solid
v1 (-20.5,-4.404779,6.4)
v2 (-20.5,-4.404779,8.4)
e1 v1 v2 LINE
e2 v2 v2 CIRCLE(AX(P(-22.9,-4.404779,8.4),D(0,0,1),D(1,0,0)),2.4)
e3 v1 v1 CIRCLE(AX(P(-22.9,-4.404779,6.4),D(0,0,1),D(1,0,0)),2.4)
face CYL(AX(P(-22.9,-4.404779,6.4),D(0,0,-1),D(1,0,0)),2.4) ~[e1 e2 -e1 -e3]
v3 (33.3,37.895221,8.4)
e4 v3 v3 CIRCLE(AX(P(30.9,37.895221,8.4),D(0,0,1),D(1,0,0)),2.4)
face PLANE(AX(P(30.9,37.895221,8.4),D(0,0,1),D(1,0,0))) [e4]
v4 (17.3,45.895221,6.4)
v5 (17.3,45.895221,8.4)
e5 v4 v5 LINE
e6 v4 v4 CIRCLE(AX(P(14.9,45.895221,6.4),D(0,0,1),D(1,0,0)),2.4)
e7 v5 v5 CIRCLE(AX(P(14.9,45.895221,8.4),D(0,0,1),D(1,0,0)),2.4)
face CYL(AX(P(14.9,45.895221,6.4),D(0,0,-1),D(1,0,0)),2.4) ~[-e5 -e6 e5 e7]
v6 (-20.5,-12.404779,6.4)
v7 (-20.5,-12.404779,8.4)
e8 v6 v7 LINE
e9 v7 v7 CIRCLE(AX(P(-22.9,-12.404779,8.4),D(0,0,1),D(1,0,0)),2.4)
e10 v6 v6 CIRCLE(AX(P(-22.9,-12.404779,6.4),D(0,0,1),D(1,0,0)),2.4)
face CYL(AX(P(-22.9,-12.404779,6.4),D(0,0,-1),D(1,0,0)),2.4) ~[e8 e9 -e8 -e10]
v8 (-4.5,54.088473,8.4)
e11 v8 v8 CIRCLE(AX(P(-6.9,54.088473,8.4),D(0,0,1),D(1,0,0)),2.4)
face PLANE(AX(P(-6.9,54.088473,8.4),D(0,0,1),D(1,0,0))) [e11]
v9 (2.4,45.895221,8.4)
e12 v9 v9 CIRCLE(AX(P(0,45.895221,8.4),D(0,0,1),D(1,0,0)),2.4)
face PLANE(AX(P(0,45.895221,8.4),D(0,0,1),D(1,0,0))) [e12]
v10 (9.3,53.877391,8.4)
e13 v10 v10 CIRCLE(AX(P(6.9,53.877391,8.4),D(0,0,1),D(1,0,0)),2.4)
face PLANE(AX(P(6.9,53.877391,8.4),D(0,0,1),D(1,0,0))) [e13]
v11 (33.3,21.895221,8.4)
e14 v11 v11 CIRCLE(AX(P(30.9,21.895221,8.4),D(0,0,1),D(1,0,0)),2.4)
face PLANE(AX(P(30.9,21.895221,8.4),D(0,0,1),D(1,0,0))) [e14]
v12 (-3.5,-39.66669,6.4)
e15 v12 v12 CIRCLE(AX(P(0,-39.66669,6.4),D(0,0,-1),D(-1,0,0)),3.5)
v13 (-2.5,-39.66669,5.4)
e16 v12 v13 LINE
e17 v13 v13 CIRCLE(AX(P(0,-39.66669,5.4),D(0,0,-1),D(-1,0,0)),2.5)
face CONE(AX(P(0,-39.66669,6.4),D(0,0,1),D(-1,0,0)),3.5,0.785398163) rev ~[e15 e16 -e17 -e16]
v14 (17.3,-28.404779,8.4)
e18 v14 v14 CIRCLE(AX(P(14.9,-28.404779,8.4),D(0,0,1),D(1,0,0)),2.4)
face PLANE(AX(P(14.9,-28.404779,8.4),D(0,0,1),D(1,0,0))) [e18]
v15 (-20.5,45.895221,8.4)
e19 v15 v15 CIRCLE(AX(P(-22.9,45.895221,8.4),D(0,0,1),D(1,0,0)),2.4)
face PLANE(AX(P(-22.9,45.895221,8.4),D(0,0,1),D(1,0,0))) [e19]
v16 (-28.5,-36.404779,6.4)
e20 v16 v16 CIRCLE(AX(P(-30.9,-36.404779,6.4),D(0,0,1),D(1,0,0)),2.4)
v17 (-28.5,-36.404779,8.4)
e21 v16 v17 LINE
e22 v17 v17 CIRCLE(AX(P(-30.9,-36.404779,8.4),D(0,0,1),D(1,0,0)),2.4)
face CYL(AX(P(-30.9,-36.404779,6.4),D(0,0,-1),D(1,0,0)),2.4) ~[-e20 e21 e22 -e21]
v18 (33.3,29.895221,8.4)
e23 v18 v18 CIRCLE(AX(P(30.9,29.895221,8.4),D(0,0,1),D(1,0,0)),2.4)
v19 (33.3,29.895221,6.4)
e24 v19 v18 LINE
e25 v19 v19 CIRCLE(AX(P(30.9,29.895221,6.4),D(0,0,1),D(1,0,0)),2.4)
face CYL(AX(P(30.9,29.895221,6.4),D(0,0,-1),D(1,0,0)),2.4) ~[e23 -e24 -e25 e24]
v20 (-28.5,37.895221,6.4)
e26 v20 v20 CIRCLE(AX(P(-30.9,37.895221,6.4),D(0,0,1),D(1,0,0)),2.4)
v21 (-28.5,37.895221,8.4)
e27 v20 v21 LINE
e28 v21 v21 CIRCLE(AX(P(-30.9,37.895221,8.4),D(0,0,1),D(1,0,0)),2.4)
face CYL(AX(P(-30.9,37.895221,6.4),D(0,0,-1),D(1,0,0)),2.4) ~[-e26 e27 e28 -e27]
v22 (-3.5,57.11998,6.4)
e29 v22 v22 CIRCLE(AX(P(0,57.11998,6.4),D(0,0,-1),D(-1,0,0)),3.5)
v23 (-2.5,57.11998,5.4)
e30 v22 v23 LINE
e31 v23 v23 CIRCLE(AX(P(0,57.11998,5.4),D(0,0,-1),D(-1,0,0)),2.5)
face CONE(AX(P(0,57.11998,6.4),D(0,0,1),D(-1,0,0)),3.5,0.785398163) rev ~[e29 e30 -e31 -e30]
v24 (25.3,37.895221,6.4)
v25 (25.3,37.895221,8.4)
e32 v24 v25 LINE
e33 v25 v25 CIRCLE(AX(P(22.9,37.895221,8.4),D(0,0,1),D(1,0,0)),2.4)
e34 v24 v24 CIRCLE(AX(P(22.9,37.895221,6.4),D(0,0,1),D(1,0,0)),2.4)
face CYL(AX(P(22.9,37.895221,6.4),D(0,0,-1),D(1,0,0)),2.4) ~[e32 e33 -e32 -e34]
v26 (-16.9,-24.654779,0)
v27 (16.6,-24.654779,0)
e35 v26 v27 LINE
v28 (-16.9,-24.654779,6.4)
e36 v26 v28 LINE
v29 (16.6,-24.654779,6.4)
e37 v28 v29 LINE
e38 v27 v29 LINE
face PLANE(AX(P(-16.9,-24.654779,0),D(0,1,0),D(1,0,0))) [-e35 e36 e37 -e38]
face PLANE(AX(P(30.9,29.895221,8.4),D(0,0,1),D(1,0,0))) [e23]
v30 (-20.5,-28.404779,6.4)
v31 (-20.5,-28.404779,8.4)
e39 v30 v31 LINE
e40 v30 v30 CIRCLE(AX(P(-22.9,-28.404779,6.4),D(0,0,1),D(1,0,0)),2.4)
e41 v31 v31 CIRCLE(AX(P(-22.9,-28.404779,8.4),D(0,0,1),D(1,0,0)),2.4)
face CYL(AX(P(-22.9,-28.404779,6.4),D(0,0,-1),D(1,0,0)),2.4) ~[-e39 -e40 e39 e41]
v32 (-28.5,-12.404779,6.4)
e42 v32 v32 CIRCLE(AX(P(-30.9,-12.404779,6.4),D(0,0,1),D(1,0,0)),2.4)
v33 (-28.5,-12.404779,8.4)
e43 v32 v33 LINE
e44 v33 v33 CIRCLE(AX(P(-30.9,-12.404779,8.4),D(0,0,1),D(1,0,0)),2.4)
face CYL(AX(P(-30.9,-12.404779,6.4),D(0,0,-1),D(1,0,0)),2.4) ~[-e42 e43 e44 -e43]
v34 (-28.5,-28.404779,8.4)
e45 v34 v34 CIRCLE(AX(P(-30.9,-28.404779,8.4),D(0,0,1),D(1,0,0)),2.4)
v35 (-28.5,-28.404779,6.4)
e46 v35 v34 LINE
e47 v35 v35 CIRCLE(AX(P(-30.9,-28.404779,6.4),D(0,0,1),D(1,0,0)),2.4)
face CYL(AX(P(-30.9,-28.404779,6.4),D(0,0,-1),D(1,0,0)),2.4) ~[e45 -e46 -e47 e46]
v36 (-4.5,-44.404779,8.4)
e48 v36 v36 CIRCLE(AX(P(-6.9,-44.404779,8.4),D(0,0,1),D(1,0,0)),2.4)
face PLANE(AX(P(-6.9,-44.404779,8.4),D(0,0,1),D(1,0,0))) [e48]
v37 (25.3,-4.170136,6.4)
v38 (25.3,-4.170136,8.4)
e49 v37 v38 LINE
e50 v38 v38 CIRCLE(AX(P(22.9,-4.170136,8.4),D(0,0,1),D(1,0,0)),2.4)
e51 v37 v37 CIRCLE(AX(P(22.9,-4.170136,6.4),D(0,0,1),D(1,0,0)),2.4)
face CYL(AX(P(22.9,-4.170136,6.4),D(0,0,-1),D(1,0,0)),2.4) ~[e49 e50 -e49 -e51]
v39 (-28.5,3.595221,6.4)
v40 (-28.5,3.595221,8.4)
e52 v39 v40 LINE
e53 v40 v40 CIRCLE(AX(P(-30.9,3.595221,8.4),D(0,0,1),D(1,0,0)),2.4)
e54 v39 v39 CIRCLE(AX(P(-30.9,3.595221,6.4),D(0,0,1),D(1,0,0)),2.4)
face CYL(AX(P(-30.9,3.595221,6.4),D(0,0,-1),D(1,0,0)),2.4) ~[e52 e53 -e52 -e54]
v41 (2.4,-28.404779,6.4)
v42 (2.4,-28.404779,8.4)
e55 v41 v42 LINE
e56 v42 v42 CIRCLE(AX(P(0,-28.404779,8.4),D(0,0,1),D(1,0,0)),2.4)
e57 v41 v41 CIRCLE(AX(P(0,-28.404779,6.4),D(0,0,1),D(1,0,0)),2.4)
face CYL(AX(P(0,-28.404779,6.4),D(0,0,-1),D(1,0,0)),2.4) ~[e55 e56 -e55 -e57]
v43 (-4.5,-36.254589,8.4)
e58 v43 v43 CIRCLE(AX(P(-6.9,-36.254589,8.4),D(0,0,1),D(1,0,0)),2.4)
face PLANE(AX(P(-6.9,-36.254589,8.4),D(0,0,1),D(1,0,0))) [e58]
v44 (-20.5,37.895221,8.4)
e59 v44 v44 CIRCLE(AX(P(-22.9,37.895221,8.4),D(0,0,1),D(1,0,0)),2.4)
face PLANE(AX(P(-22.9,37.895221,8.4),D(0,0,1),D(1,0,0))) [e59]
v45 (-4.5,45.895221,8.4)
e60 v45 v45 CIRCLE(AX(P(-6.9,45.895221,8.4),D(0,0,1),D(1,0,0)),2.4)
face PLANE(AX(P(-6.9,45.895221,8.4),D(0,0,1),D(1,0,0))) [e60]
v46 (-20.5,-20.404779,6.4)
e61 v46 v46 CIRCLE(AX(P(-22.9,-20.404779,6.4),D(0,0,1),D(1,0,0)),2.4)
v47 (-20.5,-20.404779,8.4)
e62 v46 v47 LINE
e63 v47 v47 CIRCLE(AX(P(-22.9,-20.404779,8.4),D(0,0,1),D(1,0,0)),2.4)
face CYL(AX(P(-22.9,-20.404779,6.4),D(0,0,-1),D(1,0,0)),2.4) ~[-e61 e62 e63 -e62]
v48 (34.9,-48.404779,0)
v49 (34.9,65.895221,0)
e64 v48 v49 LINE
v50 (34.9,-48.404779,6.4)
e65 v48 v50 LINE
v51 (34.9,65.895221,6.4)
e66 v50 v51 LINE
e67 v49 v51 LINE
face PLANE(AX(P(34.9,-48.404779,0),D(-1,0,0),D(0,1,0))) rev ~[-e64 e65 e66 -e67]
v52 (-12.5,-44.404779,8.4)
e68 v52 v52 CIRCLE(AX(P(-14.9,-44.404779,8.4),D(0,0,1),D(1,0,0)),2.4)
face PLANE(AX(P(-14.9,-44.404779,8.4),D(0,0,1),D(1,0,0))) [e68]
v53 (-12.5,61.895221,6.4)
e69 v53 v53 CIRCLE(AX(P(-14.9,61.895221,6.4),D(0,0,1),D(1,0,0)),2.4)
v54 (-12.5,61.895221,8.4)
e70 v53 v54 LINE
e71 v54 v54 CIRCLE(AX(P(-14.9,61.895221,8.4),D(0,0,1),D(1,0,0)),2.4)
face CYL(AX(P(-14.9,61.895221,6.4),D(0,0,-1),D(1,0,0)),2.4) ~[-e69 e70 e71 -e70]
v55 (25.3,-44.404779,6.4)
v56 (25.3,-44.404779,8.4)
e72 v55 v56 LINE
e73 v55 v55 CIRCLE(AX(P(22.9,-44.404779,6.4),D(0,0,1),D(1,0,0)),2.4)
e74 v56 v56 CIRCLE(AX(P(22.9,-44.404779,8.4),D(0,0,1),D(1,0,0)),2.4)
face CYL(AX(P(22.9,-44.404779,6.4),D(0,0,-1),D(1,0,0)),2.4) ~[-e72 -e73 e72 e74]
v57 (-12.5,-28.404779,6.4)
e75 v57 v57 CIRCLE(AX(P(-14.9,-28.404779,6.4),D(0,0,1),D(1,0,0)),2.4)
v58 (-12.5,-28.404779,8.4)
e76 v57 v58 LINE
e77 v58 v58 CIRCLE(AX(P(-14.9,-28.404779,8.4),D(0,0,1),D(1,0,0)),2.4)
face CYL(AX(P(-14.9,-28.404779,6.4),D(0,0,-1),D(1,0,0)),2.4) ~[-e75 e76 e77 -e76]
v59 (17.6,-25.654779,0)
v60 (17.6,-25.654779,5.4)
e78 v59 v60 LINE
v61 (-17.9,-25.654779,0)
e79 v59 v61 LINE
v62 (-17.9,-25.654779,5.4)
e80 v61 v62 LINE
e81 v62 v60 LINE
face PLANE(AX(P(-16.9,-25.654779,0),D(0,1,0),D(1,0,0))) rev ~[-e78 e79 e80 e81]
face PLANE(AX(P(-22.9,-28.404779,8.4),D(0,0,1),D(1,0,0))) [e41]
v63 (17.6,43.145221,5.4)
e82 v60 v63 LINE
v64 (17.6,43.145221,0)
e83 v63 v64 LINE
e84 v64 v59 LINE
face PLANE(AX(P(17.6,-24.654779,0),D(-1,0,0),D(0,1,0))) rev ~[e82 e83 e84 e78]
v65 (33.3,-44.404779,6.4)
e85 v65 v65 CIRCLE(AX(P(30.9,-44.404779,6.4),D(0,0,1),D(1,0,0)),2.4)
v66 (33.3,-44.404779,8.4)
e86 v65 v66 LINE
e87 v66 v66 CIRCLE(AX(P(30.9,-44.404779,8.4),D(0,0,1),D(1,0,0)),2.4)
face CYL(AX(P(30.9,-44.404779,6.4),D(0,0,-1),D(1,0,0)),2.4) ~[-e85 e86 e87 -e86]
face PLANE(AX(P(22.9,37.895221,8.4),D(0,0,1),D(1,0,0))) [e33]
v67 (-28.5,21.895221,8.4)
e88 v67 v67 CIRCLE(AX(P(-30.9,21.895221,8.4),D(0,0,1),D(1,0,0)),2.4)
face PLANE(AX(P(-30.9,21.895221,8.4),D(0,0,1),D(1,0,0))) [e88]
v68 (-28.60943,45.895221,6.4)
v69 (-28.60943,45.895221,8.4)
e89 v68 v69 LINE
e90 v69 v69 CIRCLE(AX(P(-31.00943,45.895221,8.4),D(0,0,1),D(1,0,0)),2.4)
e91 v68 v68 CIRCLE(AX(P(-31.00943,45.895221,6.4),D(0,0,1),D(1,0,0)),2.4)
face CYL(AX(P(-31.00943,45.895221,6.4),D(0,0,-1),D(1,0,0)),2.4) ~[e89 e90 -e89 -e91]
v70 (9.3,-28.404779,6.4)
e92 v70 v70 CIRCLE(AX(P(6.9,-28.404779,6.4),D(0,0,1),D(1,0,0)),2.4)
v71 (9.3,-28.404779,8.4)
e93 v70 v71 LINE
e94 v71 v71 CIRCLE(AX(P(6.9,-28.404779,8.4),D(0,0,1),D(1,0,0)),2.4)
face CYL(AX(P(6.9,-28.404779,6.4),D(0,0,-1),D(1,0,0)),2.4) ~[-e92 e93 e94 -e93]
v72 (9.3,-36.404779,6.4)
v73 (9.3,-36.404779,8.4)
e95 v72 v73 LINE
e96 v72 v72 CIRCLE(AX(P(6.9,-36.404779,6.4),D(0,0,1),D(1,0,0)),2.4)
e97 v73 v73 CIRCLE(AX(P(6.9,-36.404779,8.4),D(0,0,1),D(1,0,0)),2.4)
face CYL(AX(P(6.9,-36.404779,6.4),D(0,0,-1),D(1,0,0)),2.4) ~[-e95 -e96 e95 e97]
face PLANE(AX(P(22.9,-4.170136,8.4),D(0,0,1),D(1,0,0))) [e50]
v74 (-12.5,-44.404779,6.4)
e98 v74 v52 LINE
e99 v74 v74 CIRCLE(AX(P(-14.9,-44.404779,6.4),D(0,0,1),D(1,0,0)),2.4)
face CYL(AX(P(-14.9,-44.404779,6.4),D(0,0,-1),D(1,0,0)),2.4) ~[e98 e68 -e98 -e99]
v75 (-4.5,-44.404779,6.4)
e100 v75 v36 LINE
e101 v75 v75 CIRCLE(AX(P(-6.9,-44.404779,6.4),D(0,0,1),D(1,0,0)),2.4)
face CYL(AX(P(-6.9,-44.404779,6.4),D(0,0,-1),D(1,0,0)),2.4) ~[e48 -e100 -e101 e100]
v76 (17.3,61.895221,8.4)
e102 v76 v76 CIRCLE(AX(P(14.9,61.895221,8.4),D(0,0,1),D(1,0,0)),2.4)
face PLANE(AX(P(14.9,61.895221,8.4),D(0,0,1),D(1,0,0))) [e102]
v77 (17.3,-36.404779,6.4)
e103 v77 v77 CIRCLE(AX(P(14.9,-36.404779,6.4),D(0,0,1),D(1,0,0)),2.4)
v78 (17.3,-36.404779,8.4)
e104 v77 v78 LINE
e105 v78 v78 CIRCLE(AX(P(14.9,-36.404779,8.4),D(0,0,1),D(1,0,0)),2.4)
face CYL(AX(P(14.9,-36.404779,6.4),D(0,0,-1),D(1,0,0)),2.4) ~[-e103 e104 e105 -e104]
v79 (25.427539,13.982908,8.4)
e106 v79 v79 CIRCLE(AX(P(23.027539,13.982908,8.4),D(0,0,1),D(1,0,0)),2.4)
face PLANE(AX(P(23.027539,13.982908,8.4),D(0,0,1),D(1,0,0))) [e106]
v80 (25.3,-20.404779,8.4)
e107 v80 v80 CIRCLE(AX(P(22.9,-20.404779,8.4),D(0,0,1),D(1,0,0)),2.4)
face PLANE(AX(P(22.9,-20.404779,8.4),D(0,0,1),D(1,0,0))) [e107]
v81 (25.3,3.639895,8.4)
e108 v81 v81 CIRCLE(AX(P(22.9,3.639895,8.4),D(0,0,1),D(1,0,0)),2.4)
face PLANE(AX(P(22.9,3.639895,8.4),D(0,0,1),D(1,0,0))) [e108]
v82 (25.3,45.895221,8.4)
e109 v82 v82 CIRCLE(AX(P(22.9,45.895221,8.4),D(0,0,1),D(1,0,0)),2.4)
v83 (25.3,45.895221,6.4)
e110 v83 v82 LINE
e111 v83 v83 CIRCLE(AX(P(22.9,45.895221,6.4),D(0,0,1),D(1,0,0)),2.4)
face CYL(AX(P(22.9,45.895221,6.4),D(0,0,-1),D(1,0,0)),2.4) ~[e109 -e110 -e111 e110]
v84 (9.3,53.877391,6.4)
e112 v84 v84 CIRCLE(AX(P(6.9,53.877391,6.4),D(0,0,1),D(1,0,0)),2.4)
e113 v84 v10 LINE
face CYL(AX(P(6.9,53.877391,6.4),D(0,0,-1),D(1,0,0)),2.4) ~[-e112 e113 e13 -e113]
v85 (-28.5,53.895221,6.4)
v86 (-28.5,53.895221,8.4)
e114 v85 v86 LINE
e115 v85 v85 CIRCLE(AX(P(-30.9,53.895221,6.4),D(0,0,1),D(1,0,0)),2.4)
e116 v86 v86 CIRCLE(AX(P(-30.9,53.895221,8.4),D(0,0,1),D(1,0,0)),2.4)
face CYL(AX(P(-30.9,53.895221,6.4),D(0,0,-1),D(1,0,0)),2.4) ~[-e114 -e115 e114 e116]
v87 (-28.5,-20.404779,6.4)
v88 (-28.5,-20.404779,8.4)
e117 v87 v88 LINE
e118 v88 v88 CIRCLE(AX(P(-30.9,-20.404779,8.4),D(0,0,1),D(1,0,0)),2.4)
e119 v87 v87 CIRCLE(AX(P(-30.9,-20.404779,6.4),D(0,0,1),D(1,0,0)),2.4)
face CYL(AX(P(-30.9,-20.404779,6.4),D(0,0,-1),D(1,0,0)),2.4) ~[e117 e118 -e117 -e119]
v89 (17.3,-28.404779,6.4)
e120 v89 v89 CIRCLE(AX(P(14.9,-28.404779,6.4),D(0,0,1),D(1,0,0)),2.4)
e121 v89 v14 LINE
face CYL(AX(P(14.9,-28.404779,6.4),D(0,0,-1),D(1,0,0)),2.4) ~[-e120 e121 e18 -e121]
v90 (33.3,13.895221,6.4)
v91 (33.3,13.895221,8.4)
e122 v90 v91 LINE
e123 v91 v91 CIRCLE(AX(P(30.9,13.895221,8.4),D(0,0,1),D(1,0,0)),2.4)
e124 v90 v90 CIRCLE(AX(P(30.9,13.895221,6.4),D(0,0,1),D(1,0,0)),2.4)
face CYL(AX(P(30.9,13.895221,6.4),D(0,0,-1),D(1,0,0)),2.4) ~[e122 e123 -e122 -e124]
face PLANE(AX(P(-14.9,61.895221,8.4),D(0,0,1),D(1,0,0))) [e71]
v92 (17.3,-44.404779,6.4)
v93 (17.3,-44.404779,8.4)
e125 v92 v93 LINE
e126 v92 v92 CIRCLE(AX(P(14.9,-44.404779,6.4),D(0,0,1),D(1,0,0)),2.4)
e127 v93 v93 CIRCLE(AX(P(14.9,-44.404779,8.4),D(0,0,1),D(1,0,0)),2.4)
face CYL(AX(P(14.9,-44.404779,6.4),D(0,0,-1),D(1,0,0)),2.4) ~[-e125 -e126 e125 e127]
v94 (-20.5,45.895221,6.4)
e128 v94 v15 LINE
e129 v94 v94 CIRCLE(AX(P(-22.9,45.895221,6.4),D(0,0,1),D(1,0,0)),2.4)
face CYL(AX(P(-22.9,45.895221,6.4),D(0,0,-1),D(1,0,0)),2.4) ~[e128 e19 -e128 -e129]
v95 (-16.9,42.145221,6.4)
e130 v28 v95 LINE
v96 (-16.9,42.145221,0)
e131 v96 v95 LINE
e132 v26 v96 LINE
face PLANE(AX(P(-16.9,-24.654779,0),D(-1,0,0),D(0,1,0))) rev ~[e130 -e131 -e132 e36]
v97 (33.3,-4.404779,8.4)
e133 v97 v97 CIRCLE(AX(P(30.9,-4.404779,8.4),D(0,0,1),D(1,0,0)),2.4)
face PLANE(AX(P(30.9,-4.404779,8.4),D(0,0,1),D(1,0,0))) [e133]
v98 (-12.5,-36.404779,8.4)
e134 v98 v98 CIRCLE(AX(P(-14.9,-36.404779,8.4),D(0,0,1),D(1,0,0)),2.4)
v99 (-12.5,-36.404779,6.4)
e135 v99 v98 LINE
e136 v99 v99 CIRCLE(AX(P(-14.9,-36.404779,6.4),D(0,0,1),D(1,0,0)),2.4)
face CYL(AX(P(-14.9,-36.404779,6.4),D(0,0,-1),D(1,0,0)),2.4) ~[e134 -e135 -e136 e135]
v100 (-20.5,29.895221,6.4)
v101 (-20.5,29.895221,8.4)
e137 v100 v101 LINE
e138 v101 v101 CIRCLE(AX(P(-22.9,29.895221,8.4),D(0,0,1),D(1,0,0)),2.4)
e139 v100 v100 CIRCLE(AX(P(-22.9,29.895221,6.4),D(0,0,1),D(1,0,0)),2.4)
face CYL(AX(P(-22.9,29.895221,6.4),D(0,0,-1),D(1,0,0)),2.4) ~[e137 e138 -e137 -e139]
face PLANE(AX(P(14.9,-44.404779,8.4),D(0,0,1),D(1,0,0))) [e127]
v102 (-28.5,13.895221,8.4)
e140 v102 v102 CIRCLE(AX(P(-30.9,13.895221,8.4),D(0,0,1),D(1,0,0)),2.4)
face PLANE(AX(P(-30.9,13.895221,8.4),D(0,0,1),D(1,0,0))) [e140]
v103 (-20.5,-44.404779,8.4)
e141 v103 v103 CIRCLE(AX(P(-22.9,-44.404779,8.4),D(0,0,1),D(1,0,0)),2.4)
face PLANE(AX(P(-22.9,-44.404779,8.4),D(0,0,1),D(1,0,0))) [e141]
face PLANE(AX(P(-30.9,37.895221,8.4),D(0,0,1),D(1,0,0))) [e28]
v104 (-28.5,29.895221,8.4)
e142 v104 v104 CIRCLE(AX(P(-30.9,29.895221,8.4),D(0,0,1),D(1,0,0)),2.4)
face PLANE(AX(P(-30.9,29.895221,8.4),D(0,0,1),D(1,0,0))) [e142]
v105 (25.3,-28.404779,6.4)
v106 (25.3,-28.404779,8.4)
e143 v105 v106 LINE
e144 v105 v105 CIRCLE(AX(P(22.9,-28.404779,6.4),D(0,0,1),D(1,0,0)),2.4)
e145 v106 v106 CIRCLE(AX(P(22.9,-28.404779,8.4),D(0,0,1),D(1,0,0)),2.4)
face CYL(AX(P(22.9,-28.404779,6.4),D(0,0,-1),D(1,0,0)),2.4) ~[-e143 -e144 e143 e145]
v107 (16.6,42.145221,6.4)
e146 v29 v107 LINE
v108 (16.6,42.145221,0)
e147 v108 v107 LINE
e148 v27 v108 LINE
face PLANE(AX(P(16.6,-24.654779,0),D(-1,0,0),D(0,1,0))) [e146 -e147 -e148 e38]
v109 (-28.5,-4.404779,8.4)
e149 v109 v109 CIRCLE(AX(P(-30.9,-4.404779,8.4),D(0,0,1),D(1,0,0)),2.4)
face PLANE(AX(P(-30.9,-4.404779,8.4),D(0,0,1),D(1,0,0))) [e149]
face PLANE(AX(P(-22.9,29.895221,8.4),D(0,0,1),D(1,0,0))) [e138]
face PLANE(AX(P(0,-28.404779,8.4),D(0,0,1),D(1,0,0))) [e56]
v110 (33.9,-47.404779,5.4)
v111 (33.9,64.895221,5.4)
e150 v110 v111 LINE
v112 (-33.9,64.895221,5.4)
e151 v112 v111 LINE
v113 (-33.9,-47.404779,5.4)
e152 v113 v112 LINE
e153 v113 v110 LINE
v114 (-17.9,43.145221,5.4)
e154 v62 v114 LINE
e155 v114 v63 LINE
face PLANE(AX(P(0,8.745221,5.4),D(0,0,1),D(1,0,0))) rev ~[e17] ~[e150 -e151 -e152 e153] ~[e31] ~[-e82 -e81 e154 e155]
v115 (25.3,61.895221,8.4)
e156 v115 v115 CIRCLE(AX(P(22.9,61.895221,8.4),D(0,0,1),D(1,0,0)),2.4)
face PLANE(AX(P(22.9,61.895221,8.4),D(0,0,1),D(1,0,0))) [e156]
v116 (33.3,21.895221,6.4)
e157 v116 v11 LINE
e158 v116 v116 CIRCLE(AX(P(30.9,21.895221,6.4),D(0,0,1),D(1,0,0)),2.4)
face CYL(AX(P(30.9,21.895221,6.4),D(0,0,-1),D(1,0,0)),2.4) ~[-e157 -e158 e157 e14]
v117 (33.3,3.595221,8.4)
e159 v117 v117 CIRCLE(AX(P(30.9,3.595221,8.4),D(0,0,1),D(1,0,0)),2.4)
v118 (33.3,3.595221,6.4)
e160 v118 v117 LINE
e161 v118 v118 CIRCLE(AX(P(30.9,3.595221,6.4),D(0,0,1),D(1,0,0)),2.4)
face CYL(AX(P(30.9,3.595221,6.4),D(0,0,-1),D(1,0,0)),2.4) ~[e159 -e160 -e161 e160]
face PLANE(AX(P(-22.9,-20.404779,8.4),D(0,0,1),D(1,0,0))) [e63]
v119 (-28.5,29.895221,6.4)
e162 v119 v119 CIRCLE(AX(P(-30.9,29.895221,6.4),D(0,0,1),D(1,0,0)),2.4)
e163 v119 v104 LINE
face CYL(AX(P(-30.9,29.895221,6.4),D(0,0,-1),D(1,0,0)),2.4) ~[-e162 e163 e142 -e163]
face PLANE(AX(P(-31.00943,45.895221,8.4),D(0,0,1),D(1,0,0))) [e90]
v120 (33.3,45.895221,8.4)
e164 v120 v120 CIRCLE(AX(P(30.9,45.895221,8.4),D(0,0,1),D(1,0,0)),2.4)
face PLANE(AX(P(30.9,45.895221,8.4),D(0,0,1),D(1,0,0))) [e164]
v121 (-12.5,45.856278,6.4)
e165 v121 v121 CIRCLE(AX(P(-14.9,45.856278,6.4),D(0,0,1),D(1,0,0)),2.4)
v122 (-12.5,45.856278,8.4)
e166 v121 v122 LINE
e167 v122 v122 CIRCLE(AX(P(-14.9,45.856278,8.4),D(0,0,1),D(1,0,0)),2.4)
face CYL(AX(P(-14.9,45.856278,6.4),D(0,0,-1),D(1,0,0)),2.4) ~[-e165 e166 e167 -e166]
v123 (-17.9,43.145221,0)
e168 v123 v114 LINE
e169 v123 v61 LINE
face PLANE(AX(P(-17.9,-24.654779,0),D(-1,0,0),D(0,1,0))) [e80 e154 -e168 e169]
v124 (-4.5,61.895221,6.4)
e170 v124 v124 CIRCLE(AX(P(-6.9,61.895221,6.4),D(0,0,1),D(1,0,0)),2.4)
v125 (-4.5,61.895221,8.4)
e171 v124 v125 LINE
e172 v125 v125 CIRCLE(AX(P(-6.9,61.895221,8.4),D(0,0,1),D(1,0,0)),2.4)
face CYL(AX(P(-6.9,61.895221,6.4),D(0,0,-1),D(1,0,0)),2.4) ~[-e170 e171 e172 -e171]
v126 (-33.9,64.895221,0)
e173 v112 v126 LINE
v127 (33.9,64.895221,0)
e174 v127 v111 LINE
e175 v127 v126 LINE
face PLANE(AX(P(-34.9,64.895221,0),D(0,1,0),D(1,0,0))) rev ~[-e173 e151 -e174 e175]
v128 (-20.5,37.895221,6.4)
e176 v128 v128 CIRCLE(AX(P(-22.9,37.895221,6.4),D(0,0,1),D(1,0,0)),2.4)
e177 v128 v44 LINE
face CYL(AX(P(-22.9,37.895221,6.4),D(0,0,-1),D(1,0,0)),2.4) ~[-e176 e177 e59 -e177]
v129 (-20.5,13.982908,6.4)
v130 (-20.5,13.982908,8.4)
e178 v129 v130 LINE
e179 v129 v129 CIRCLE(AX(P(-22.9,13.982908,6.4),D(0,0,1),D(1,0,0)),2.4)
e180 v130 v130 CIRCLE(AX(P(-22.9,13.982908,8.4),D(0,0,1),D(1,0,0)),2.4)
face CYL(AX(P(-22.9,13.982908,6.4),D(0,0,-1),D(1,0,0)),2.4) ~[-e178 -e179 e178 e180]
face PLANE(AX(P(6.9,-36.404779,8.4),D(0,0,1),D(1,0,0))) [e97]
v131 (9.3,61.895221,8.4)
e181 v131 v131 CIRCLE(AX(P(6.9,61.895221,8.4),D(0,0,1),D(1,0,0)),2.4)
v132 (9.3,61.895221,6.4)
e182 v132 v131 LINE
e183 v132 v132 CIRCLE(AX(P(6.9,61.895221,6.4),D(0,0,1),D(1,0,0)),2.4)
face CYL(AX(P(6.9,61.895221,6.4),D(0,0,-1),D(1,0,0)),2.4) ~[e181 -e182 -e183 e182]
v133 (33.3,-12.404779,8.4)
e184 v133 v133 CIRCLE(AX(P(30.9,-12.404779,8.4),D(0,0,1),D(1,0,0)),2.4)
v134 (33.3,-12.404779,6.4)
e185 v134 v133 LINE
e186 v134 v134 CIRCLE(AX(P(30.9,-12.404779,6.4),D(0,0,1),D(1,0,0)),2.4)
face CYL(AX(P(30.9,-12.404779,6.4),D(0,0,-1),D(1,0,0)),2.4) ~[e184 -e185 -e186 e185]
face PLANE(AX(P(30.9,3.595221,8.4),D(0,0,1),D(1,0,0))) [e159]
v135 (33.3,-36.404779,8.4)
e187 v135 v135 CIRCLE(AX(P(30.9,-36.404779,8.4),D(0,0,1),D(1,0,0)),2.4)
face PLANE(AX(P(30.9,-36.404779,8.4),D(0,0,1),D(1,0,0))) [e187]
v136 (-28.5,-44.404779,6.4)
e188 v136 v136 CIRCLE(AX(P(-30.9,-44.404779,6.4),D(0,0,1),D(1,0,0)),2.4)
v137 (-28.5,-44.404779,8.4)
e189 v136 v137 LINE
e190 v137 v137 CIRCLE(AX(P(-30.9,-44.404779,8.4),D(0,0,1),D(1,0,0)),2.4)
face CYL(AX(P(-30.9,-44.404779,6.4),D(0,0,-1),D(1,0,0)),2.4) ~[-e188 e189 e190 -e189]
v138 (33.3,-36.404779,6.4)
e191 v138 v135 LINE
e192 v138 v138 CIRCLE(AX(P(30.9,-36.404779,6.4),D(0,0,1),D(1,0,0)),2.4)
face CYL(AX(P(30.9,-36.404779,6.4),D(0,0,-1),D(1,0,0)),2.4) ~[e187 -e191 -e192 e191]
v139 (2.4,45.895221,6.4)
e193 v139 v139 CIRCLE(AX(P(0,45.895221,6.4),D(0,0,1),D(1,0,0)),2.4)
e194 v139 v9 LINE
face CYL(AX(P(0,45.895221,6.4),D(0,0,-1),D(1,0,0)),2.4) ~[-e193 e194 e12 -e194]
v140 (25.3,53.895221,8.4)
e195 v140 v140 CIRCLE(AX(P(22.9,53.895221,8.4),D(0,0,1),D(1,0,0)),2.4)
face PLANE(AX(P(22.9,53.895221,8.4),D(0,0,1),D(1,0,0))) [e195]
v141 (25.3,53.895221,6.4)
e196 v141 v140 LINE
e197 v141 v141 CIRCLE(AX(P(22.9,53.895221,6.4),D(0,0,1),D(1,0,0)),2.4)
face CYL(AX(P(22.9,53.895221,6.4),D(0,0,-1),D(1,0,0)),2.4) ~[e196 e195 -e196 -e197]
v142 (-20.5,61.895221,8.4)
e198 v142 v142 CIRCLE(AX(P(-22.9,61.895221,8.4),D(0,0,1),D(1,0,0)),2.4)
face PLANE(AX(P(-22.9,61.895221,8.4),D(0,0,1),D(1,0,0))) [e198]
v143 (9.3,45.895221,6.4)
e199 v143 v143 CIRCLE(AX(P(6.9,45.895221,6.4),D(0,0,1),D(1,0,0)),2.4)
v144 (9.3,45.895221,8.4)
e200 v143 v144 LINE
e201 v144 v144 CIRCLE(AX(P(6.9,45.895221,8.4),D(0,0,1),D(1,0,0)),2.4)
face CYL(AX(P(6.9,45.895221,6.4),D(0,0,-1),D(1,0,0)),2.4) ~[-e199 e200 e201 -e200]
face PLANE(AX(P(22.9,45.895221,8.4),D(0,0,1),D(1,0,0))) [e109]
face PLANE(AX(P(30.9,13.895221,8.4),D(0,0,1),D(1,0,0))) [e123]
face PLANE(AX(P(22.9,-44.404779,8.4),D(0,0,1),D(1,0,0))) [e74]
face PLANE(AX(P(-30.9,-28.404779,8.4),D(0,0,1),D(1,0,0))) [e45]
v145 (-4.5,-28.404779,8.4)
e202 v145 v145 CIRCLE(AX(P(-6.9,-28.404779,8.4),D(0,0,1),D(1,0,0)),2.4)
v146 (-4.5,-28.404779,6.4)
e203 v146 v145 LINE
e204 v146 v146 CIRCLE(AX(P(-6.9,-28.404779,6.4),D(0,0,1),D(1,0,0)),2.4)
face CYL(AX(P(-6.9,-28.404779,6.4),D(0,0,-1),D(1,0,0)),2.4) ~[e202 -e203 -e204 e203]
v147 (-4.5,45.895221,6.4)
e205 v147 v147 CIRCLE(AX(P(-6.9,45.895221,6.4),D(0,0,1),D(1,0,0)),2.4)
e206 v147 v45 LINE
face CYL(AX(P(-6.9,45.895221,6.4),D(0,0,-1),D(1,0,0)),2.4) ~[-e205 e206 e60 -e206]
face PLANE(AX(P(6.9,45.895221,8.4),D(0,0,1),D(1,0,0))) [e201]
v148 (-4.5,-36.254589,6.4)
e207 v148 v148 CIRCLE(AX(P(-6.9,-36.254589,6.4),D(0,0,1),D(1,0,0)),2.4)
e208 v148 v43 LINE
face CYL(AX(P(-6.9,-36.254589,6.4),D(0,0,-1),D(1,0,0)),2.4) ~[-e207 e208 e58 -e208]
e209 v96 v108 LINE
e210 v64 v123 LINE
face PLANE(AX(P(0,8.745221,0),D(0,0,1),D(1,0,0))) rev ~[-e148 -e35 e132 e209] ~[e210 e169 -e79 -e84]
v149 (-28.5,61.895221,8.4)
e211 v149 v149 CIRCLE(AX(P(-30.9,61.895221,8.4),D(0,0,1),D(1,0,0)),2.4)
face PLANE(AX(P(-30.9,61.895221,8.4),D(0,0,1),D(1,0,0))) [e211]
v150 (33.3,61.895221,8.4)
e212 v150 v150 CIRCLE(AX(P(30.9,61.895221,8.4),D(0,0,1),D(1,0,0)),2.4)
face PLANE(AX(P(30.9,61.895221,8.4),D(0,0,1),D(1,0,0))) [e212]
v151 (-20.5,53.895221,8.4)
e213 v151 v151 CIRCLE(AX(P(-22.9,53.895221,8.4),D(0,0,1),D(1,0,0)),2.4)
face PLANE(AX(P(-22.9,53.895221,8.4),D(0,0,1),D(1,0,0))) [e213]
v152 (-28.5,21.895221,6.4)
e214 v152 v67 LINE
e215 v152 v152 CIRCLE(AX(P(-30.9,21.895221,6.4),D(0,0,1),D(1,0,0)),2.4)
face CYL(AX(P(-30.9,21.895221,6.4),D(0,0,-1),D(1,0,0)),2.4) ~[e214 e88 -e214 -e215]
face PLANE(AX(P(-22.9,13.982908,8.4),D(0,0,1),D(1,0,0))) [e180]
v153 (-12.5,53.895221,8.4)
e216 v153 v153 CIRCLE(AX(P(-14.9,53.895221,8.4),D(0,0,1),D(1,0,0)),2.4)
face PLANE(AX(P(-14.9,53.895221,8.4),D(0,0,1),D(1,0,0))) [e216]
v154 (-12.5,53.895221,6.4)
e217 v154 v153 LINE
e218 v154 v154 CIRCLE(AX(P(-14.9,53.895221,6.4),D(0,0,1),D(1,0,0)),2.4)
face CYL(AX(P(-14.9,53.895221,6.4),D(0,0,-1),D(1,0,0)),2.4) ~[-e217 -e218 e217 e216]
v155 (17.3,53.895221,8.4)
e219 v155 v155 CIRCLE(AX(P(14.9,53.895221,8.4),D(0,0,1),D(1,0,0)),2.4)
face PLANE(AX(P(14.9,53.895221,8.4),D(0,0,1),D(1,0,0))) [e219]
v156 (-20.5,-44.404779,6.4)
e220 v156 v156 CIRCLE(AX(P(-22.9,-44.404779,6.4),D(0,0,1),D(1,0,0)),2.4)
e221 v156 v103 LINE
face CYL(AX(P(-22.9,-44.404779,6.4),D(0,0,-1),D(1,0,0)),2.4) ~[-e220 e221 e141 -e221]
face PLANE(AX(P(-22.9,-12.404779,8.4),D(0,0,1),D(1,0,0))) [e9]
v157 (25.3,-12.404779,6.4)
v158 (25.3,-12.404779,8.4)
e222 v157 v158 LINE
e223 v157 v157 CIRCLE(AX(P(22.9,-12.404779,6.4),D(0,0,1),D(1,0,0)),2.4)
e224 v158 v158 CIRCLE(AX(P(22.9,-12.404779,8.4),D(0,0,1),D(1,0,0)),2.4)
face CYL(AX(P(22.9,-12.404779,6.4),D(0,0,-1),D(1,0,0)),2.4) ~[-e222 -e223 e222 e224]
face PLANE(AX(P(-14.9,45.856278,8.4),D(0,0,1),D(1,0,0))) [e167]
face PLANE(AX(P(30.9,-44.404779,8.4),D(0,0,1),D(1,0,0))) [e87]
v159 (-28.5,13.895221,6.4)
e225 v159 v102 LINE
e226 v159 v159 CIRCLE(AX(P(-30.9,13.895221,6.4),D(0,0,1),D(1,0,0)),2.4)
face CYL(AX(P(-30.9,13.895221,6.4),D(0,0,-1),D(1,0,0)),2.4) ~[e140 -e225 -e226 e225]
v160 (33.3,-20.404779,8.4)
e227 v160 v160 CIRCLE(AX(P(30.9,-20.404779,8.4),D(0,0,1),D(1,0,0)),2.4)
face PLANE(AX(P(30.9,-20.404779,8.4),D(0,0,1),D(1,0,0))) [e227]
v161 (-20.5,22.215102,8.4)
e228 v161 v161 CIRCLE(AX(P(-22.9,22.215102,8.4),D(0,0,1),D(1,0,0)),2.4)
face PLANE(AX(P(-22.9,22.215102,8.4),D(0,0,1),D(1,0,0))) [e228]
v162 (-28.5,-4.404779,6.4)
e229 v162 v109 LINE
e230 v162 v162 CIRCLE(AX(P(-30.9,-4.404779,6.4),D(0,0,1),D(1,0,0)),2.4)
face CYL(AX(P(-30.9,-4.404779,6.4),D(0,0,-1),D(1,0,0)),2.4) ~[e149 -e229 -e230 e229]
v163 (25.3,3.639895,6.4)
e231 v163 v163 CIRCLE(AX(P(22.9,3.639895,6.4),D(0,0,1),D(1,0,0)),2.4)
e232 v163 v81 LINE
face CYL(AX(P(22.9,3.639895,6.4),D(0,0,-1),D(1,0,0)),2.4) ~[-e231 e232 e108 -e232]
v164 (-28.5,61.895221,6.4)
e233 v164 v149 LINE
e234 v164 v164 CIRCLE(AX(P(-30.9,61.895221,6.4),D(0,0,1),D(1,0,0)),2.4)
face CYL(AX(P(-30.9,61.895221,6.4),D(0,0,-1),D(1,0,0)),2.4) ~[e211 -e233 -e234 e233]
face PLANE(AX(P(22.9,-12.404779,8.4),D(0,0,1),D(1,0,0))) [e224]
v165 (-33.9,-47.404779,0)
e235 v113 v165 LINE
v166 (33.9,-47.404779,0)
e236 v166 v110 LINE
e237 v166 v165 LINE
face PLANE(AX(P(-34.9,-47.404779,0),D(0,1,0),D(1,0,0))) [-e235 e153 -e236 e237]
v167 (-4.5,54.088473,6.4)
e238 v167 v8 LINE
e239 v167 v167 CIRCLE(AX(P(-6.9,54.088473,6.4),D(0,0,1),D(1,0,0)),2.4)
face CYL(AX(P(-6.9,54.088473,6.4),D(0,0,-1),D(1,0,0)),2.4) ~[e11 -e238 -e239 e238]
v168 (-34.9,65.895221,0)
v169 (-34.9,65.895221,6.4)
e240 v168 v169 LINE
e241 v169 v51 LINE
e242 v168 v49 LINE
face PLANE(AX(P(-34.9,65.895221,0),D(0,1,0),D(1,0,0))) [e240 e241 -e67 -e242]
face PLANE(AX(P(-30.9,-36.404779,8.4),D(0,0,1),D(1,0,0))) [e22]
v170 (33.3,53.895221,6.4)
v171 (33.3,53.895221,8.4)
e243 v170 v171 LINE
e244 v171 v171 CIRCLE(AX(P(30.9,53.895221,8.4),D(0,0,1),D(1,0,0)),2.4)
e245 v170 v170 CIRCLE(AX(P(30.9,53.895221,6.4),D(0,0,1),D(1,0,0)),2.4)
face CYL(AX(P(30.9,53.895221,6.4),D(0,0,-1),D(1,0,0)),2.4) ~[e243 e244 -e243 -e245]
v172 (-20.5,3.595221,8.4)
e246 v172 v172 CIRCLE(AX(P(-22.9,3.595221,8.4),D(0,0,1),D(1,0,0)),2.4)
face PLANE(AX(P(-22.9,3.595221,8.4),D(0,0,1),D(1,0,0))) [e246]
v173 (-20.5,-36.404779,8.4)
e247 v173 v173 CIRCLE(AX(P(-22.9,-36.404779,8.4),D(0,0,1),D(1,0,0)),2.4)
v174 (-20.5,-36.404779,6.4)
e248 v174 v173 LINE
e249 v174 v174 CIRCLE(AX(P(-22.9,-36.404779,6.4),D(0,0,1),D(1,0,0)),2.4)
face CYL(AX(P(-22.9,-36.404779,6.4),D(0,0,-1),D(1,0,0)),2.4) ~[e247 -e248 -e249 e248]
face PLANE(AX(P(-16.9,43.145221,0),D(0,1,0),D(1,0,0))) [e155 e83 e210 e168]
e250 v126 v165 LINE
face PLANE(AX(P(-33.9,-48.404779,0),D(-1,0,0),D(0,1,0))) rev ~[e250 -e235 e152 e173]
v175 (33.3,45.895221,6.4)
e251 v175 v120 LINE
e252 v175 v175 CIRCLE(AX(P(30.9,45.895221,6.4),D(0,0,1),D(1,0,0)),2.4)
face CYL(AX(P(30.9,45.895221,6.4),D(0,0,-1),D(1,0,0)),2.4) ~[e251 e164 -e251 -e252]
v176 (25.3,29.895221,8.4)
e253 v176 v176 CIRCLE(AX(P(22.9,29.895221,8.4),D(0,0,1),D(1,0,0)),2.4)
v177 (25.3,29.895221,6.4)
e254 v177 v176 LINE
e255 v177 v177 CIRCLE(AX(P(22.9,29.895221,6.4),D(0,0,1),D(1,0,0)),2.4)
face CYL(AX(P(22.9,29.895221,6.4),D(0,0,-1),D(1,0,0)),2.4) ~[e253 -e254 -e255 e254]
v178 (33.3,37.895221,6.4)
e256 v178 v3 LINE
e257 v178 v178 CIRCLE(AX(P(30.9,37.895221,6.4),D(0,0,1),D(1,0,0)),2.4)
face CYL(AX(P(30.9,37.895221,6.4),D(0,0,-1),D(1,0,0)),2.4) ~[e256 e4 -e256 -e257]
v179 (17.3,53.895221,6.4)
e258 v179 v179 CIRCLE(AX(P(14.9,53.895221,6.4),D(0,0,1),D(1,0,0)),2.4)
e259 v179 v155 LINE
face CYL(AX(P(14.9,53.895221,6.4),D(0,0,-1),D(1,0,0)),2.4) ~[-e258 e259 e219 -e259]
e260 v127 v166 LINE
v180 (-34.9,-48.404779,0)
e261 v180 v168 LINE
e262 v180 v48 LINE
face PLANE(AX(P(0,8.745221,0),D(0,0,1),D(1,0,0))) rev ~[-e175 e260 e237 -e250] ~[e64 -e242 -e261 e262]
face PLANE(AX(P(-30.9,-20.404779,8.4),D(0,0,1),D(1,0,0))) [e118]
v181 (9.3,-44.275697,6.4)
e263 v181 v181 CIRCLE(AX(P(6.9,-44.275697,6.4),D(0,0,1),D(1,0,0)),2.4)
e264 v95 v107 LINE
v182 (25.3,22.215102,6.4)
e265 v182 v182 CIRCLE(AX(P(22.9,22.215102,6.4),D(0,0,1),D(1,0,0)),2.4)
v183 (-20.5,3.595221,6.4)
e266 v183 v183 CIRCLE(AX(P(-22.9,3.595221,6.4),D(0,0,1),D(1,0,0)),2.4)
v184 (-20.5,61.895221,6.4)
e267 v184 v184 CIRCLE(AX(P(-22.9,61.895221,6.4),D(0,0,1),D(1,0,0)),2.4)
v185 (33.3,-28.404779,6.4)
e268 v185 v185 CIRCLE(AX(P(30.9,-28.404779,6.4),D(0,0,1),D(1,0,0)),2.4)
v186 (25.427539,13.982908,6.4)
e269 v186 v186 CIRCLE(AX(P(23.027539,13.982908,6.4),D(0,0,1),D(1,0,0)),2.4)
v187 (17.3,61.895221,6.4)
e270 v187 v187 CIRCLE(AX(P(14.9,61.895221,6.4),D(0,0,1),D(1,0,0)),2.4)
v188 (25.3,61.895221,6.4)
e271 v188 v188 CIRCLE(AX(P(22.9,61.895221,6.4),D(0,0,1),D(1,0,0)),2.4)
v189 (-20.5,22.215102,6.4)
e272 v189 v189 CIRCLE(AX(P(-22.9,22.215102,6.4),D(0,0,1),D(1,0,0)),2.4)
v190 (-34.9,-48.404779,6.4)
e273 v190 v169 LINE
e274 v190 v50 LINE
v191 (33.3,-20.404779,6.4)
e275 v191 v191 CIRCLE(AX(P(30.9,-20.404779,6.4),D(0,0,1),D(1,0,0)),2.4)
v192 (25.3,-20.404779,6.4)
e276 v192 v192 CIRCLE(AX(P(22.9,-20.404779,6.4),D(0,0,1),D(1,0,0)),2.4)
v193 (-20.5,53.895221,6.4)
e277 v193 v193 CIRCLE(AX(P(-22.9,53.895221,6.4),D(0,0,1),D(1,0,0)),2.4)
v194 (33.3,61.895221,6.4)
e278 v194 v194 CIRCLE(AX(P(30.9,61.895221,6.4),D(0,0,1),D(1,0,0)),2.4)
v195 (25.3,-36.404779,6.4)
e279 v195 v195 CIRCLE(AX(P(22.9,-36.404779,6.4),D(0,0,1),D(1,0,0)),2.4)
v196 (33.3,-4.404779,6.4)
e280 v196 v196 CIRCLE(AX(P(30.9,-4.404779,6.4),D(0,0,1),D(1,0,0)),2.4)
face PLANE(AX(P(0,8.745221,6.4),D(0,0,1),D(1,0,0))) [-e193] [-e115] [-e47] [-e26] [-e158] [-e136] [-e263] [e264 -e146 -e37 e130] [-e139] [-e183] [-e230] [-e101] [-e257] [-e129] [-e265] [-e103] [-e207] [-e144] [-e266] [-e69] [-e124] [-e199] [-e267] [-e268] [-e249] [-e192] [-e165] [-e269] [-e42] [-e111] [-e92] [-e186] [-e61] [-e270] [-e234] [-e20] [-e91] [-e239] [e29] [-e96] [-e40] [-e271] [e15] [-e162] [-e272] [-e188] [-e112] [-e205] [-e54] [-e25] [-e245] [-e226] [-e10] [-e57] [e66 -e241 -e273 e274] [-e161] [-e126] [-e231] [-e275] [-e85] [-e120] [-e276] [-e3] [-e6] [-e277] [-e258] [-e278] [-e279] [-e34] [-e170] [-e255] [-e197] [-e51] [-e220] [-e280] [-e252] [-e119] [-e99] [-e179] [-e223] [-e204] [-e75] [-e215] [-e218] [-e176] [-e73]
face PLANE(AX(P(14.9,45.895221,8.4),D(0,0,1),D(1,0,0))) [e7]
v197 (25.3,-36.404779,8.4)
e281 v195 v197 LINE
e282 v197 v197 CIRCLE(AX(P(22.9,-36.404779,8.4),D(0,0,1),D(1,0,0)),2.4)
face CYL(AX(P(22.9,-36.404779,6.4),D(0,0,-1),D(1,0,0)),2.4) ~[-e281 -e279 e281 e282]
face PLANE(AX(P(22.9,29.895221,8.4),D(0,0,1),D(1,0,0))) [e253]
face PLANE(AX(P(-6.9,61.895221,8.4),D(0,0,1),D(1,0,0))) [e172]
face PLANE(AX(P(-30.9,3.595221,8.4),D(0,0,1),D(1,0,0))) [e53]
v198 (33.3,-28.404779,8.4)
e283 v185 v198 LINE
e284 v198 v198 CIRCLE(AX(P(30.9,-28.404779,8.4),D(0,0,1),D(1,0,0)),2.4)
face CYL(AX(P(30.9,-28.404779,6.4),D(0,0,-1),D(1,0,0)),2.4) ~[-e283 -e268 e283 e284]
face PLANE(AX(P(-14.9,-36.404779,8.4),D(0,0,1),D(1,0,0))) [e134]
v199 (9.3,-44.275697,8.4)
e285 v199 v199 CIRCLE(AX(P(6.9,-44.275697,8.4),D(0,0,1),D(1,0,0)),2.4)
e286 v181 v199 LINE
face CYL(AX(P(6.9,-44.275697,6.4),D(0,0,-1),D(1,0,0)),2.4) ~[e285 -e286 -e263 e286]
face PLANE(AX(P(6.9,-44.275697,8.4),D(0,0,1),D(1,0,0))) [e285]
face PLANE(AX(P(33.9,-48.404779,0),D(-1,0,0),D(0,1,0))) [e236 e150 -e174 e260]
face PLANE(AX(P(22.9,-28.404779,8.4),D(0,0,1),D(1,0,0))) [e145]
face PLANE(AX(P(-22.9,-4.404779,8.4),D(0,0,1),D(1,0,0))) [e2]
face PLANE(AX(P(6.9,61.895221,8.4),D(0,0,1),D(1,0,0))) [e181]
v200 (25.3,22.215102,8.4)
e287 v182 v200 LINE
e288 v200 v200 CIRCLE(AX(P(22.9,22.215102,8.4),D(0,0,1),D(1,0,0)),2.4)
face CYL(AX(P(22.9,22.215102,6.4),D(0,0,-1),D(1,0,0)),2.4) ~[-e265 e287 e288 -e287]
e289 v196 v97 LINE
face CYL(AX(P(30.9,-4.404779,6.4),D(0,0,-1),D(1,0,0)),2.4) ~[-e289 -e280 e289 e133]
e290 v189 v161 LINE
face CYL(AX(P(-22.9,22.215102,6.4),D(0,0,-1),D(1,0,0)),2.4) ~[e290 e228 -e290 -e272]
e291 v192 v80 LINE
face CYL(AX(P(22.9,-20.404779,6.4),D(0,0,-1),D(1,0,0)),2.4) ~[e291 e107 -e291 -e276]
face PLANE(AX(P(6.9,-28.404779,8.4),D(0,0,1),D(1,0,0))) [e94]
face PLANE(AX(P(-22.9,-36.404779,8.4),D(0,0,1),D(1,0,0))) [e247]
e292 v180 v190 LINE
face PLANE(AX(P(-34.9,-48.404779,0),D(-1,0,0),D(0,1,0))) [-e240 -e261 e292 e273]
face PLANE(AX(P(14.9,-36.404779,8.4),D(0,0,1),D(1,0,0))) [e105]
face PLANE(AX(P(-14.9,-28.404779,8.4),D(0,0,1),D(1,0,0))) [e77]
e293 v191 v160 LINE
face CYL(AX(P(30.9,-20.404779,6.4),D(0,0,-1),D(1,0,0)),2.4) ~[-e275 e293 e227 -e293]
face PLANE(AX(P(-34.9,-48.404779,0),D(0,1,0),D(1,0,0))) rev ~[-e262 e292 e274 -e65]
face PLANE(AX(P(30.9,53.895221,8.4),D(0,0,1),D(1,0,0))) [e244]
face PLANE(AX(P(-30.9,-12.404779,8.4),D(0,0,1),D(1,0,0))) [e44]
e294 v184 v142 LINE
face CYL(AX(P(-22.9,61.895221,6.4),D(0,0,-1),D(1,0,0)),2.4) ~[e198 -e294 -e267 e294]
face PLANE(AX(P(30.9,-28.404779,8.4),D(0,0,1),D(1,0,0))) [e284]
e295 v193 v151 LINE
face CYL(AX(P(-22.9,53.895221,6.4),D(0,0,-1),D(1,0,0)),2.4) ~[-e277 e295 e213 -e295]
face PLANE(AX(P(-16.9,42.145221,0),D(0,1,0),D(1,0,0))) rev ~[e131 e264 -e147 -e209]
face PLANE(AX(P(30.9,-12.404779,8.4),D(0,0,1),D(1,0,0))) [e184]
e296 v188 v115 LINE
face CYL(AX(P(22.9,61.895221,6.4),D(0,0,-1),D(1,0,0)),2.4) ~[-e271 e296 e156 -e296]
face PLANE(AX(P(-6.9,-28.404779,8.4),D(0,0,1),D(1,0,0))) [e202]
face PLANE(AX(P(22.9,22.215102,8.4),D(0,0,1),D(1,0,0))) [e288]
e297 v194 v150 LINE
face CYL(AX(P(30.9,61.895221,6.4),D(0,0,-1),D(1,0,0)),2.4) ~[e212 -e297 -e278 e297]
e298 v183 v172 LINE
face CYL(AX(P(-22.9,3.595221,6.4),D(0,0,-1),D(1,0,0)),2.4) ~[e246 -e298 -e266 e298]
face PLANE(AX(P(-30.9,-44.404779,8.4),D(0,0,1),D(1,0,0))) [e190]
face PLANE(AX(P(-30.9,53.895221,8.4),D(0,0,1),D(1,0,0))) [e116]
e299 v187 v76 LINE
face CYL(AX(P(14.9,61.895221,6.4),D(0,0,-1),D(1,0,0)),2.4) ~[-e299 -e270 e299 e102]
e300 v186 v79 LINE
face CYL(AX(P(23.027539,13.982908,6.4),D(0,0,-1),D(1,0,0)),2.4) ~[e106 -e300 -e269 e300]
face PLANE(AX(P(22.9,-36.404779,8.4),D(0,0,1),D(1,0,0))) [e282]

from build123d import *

# Parameters (mm, degrees)
F0_W           = 69.8
F0_H           = 114.3
F0_W_2         = 33.5
F0_H_2         = 66.8
F1_DEPTH       = 6.4
F2_T           = -1
F3_R           = 2.4
F4_DEPTH       = 2
F5_DEPTH       = 2
F6_D           = 4
F6_CSINK_D     = 7
F6_CSINK_ANGLE = 90
F7_D           = 4
F7_CSINK_D     = 7
F7_CSINK_ANGLE = 90


# Not quite as in the source:
# - a feature names something its author has since deleted; it is built from what else it names


with BuildPart() as f1:
    # F0 (on Top) → F1 (new body)
    with BuildSketch(Plane.XY):
        with Locations((0, 8.7452211694)):
            Rectangle(F0_W, F0_H)
        with Locations((-0.15, 8.7452211694)):
            Rectangle(F0_W_2, F0_H_2, mode=Mode.SUBTRACT)
    extrude(amount=F1_DEPTH)

    # F2
    f2_openings = [f1.faces().sort_by_distance(p)[0] for p in [
        (0, 64.555948, 0),
    ]]
    offset(amount=F2_T, openings=f2_openings, kind=Kind.INTERSECTION)

    # F3 (on face) → F4 (join)
    with BuildSketch(Plane.XY.offset(6.4)):
        with Locations((30.9, -44.4047788306)):
            Circle(F3_R)
        with Locations((22.9, -44.4047788306)):
            Circle(F3_R)
        with Locations((14.9, -44.4047788306)):
            Circle(F3_R)
        with Locations((6.9, -44.2756973207)):
            Circle(F3_R)
        with Locations((-6.9, -44.4047788306)):
            Circle(F3_R)
        with Locations((-14.9, -44.4047788306)):
            Circle(F3_R)
        with Locations((-22.9, -44.4047788306)):
            Circle(F3_R)
        with Locations((-30.9, -44.4047788306)):
            Circle(F3_R)
        with Locations((-30.9, -36.4047788306)):
            Circle(F3_R)
        with Locations((-22.9, -36.4047788306)):
            Circle(F3_R)
        with Locations((-14.9, -36.4047788306)):
            Circle(F3_R)
        with Locations((-6.9, -36.2545885146)):
            Circle(F3_R)
        with Locations((6.9, -36.4047788306)):
            Circle(F3_R)
        with Locations((14.9, -36.4047788306)):
            Circle(F3_R)
        with Locations((22.9, -36.4047788306)):
            Circle(F3_R)
        with Locations((30.9, -36.4047788306)):
            Circle(F3_R)
        with Locations((30.9, -28.4047788306)):
            Circle(F3_R)
        with Locations((22.9, -28.4047788306)):
            Circle(F3_R)
        with Locations((14.9, -28.4047788306)):
            Circle(F3_R)
        with Locations((6.9, -28.4047788306)):
            Circle(F3_R)
        with Locations((0, -28.4047788306)):
            Circle(F3_R)
        with Locations((-6.9, -28.4047788306)):
            Circle(F3_R)
        with Locations((-14.9, -28.4047788306)):
            Circle(F3_R)
        with Locations((-22.9, -28.4047788306)):
            Circle(F3_R)
        with Locations((-30.9, -28.4047788306)):
            Circle(F3_R)
        with Locations((-30.9, -20.4047788306)):
            Circle(F3_R)
        with Locations((-22.9, -20.4047788306)):
            Circle(F3_R)
        with Locations((22.9, -20.4047788306)):
            Circle(F3_R)
        with Locations((30.9, -20.4047788306)):
            Circle(F3_R)
        with Locations((-30.9, -12.4047788306)):
            Circle(F3_R)
        with Locations((-30.9, -4.4047788306)):
            Circle(F3_R)
        with Locations((-30.9, 3.5952211694)):
            Circle(F3_R)
        with Locations((-30.9, 13.8952211694)):
            Circle(F3_R)
        with Locations((-30.9, 29.8952211694)):
            Circle(F3_R)
        with Locations((-30.9, 21.8952211694)):
            Circle(F3_R)
        with Locations((-30.9, 37.8952211694)):
            Circle(F3_R)
        with Locations((-22.9, 37.8952211694)):
            Circle(F3_R)
        with Locations((-22.9, 29.8952211694)):
            Circle(F3_R)
        with Locations((-22.9, 22.2151018679)):
            Circle(F3_R)
        with Locations((-22.9, 13.9829078689)):
            Circle(F3_R)
        with Locations((-22.9, 3.5952211694)):
            Circle(F3_R)
        with Locations((-22.9, -4.4047788306)):
            Circle(F3_R)
        with Locations((-22.9, -12.4047788306)):
            Circle(F3_R)
        with Locations((22.9, -12.4047788306)):
            Circle(F3_R)
        with Locations((22.9, -4.1701360606)):
            Circle(F3_R)
        with Locations((22.9, 3.6398950033)):
            Circle(F3_R)
        with Locations((23.0275392532, 13.9829078689)):
            Circle(F3_R)
        with Locations((22.9, 22.2151018679)):
            Circle(F3_R)
        with Locations((22.9, 29.8952211694)):
            Circle(F3_R)
        with Locations((22.9, 37.8952211694)):
            Circle(F3_R)
        with Locations((30.9, 37.8952211694)):
            Circle(F3_R)
        with Locations((30.9, 29.8952211694)):
            Circle(F3_R)
        with Locations((30.9, 21.8952211694)):
            Circle(F3_R)
        with Locations((30.9, 13.8952211694)):
            Circle(F3_R)
        with Locations((30.9, 3.5952211694)):
            Circle(F3_R)
        with Locations((30.9, -4.4047788306)):
            Circle(F3_R)
        with Locations((30.9, -12.4047788306)):
            Circle(F3_R)
        with Locations((-30.9, 61.8952211694)):
            Circle(F3_R)
        with Locations((-30.9, 53.8952211694)):
            Circle(F3_R)
        with Locations((-31.0094300658, 45.8952211694)):
            Circle(F3_R)
        with Locations((-22.9, 45.8952211694)):
            Circle(F3_R)
        with Locations((-22.9, 53.8952211694)):
            Circle(F3_R)
        with Locations((-22.9, 61.8952211694)):
            Circle(F3_R)
        with Locations((-14.9, 61.8952211694)):
            Circle(F3_R)
        with Locations((-14.9, 53.8952211694)):
            Circle(F3_R)
        with Locations((-14.9, 45.8562783897)):
            Circle(F3_R)
        with Locations((-6.9, 45.8952211694)):
            Circle(F3_R)
        with Locations((-6.9, 54.08847332)):
            Circle(F3_R)
        with Locations((-6.9, 61.8952211694)):
            Circle(F3_R)
        with Locations((6.9, 61.8952211694)):
            Circle(F3_R)
        with Locations((0, 45.8952211694)):
            Circle(F3_R)
        with Locations((6.9, 45.8952211694)):
            Circle(F3_R)
        with Locations((6.9, 53.8773909211)):
            Circle(F3_R)
        with Locations((14.9, 61.8952211694)):
            Circle(F3_R)
        with Locations((14.9, 53.8952211694)):
            Circle(F3_R)
        with Locations((14.9, 45.8952211694)):
            Circle(F3_R)
        with Locations((22.9, 53.8952211694)):
            Circle(F3_R)
        with Locations((22.9, 61.8952211694)):
            Circle(F3_R)
        with Locations((30.9, 61.8952211694)):
            Circle(F3_R)
        with Locations((30.9, 53.8952211694)):
            Circle(F3_R)
        with Locations((30.9, 45.8952211694)):
            Circle(F3_R)
    extrude(amount=F4_DEPTH)

    # F3 (on face) → F5 (join)
    with BuildSketch(Plane.XY.offset(6.4)):
        with Locations((22.9, 45.8952211694)):
            Circle(F3_R)
    extrude(amount=F5_DEPTH)

    # F6 (through all)
    with Locations(Plane.XY.offset(6.4)):
        with Locations((0, 57.1199804544)):
            CounterSinkHole(F6_D / 2, F6_CSINK_D / 2, counter_sink_angle=F6_CSINK_ANGLE)

    # F7 (through all)
    with Locations(Plane.XY.offset(6.4)):
        with Locations((0, -39.6666899323)):
            CounterSinkHole(F7_D / 2, F7_CSINK_D / 2, counter_sink_angle=F7_CSINK_ANGLE)


solid = f1.part
